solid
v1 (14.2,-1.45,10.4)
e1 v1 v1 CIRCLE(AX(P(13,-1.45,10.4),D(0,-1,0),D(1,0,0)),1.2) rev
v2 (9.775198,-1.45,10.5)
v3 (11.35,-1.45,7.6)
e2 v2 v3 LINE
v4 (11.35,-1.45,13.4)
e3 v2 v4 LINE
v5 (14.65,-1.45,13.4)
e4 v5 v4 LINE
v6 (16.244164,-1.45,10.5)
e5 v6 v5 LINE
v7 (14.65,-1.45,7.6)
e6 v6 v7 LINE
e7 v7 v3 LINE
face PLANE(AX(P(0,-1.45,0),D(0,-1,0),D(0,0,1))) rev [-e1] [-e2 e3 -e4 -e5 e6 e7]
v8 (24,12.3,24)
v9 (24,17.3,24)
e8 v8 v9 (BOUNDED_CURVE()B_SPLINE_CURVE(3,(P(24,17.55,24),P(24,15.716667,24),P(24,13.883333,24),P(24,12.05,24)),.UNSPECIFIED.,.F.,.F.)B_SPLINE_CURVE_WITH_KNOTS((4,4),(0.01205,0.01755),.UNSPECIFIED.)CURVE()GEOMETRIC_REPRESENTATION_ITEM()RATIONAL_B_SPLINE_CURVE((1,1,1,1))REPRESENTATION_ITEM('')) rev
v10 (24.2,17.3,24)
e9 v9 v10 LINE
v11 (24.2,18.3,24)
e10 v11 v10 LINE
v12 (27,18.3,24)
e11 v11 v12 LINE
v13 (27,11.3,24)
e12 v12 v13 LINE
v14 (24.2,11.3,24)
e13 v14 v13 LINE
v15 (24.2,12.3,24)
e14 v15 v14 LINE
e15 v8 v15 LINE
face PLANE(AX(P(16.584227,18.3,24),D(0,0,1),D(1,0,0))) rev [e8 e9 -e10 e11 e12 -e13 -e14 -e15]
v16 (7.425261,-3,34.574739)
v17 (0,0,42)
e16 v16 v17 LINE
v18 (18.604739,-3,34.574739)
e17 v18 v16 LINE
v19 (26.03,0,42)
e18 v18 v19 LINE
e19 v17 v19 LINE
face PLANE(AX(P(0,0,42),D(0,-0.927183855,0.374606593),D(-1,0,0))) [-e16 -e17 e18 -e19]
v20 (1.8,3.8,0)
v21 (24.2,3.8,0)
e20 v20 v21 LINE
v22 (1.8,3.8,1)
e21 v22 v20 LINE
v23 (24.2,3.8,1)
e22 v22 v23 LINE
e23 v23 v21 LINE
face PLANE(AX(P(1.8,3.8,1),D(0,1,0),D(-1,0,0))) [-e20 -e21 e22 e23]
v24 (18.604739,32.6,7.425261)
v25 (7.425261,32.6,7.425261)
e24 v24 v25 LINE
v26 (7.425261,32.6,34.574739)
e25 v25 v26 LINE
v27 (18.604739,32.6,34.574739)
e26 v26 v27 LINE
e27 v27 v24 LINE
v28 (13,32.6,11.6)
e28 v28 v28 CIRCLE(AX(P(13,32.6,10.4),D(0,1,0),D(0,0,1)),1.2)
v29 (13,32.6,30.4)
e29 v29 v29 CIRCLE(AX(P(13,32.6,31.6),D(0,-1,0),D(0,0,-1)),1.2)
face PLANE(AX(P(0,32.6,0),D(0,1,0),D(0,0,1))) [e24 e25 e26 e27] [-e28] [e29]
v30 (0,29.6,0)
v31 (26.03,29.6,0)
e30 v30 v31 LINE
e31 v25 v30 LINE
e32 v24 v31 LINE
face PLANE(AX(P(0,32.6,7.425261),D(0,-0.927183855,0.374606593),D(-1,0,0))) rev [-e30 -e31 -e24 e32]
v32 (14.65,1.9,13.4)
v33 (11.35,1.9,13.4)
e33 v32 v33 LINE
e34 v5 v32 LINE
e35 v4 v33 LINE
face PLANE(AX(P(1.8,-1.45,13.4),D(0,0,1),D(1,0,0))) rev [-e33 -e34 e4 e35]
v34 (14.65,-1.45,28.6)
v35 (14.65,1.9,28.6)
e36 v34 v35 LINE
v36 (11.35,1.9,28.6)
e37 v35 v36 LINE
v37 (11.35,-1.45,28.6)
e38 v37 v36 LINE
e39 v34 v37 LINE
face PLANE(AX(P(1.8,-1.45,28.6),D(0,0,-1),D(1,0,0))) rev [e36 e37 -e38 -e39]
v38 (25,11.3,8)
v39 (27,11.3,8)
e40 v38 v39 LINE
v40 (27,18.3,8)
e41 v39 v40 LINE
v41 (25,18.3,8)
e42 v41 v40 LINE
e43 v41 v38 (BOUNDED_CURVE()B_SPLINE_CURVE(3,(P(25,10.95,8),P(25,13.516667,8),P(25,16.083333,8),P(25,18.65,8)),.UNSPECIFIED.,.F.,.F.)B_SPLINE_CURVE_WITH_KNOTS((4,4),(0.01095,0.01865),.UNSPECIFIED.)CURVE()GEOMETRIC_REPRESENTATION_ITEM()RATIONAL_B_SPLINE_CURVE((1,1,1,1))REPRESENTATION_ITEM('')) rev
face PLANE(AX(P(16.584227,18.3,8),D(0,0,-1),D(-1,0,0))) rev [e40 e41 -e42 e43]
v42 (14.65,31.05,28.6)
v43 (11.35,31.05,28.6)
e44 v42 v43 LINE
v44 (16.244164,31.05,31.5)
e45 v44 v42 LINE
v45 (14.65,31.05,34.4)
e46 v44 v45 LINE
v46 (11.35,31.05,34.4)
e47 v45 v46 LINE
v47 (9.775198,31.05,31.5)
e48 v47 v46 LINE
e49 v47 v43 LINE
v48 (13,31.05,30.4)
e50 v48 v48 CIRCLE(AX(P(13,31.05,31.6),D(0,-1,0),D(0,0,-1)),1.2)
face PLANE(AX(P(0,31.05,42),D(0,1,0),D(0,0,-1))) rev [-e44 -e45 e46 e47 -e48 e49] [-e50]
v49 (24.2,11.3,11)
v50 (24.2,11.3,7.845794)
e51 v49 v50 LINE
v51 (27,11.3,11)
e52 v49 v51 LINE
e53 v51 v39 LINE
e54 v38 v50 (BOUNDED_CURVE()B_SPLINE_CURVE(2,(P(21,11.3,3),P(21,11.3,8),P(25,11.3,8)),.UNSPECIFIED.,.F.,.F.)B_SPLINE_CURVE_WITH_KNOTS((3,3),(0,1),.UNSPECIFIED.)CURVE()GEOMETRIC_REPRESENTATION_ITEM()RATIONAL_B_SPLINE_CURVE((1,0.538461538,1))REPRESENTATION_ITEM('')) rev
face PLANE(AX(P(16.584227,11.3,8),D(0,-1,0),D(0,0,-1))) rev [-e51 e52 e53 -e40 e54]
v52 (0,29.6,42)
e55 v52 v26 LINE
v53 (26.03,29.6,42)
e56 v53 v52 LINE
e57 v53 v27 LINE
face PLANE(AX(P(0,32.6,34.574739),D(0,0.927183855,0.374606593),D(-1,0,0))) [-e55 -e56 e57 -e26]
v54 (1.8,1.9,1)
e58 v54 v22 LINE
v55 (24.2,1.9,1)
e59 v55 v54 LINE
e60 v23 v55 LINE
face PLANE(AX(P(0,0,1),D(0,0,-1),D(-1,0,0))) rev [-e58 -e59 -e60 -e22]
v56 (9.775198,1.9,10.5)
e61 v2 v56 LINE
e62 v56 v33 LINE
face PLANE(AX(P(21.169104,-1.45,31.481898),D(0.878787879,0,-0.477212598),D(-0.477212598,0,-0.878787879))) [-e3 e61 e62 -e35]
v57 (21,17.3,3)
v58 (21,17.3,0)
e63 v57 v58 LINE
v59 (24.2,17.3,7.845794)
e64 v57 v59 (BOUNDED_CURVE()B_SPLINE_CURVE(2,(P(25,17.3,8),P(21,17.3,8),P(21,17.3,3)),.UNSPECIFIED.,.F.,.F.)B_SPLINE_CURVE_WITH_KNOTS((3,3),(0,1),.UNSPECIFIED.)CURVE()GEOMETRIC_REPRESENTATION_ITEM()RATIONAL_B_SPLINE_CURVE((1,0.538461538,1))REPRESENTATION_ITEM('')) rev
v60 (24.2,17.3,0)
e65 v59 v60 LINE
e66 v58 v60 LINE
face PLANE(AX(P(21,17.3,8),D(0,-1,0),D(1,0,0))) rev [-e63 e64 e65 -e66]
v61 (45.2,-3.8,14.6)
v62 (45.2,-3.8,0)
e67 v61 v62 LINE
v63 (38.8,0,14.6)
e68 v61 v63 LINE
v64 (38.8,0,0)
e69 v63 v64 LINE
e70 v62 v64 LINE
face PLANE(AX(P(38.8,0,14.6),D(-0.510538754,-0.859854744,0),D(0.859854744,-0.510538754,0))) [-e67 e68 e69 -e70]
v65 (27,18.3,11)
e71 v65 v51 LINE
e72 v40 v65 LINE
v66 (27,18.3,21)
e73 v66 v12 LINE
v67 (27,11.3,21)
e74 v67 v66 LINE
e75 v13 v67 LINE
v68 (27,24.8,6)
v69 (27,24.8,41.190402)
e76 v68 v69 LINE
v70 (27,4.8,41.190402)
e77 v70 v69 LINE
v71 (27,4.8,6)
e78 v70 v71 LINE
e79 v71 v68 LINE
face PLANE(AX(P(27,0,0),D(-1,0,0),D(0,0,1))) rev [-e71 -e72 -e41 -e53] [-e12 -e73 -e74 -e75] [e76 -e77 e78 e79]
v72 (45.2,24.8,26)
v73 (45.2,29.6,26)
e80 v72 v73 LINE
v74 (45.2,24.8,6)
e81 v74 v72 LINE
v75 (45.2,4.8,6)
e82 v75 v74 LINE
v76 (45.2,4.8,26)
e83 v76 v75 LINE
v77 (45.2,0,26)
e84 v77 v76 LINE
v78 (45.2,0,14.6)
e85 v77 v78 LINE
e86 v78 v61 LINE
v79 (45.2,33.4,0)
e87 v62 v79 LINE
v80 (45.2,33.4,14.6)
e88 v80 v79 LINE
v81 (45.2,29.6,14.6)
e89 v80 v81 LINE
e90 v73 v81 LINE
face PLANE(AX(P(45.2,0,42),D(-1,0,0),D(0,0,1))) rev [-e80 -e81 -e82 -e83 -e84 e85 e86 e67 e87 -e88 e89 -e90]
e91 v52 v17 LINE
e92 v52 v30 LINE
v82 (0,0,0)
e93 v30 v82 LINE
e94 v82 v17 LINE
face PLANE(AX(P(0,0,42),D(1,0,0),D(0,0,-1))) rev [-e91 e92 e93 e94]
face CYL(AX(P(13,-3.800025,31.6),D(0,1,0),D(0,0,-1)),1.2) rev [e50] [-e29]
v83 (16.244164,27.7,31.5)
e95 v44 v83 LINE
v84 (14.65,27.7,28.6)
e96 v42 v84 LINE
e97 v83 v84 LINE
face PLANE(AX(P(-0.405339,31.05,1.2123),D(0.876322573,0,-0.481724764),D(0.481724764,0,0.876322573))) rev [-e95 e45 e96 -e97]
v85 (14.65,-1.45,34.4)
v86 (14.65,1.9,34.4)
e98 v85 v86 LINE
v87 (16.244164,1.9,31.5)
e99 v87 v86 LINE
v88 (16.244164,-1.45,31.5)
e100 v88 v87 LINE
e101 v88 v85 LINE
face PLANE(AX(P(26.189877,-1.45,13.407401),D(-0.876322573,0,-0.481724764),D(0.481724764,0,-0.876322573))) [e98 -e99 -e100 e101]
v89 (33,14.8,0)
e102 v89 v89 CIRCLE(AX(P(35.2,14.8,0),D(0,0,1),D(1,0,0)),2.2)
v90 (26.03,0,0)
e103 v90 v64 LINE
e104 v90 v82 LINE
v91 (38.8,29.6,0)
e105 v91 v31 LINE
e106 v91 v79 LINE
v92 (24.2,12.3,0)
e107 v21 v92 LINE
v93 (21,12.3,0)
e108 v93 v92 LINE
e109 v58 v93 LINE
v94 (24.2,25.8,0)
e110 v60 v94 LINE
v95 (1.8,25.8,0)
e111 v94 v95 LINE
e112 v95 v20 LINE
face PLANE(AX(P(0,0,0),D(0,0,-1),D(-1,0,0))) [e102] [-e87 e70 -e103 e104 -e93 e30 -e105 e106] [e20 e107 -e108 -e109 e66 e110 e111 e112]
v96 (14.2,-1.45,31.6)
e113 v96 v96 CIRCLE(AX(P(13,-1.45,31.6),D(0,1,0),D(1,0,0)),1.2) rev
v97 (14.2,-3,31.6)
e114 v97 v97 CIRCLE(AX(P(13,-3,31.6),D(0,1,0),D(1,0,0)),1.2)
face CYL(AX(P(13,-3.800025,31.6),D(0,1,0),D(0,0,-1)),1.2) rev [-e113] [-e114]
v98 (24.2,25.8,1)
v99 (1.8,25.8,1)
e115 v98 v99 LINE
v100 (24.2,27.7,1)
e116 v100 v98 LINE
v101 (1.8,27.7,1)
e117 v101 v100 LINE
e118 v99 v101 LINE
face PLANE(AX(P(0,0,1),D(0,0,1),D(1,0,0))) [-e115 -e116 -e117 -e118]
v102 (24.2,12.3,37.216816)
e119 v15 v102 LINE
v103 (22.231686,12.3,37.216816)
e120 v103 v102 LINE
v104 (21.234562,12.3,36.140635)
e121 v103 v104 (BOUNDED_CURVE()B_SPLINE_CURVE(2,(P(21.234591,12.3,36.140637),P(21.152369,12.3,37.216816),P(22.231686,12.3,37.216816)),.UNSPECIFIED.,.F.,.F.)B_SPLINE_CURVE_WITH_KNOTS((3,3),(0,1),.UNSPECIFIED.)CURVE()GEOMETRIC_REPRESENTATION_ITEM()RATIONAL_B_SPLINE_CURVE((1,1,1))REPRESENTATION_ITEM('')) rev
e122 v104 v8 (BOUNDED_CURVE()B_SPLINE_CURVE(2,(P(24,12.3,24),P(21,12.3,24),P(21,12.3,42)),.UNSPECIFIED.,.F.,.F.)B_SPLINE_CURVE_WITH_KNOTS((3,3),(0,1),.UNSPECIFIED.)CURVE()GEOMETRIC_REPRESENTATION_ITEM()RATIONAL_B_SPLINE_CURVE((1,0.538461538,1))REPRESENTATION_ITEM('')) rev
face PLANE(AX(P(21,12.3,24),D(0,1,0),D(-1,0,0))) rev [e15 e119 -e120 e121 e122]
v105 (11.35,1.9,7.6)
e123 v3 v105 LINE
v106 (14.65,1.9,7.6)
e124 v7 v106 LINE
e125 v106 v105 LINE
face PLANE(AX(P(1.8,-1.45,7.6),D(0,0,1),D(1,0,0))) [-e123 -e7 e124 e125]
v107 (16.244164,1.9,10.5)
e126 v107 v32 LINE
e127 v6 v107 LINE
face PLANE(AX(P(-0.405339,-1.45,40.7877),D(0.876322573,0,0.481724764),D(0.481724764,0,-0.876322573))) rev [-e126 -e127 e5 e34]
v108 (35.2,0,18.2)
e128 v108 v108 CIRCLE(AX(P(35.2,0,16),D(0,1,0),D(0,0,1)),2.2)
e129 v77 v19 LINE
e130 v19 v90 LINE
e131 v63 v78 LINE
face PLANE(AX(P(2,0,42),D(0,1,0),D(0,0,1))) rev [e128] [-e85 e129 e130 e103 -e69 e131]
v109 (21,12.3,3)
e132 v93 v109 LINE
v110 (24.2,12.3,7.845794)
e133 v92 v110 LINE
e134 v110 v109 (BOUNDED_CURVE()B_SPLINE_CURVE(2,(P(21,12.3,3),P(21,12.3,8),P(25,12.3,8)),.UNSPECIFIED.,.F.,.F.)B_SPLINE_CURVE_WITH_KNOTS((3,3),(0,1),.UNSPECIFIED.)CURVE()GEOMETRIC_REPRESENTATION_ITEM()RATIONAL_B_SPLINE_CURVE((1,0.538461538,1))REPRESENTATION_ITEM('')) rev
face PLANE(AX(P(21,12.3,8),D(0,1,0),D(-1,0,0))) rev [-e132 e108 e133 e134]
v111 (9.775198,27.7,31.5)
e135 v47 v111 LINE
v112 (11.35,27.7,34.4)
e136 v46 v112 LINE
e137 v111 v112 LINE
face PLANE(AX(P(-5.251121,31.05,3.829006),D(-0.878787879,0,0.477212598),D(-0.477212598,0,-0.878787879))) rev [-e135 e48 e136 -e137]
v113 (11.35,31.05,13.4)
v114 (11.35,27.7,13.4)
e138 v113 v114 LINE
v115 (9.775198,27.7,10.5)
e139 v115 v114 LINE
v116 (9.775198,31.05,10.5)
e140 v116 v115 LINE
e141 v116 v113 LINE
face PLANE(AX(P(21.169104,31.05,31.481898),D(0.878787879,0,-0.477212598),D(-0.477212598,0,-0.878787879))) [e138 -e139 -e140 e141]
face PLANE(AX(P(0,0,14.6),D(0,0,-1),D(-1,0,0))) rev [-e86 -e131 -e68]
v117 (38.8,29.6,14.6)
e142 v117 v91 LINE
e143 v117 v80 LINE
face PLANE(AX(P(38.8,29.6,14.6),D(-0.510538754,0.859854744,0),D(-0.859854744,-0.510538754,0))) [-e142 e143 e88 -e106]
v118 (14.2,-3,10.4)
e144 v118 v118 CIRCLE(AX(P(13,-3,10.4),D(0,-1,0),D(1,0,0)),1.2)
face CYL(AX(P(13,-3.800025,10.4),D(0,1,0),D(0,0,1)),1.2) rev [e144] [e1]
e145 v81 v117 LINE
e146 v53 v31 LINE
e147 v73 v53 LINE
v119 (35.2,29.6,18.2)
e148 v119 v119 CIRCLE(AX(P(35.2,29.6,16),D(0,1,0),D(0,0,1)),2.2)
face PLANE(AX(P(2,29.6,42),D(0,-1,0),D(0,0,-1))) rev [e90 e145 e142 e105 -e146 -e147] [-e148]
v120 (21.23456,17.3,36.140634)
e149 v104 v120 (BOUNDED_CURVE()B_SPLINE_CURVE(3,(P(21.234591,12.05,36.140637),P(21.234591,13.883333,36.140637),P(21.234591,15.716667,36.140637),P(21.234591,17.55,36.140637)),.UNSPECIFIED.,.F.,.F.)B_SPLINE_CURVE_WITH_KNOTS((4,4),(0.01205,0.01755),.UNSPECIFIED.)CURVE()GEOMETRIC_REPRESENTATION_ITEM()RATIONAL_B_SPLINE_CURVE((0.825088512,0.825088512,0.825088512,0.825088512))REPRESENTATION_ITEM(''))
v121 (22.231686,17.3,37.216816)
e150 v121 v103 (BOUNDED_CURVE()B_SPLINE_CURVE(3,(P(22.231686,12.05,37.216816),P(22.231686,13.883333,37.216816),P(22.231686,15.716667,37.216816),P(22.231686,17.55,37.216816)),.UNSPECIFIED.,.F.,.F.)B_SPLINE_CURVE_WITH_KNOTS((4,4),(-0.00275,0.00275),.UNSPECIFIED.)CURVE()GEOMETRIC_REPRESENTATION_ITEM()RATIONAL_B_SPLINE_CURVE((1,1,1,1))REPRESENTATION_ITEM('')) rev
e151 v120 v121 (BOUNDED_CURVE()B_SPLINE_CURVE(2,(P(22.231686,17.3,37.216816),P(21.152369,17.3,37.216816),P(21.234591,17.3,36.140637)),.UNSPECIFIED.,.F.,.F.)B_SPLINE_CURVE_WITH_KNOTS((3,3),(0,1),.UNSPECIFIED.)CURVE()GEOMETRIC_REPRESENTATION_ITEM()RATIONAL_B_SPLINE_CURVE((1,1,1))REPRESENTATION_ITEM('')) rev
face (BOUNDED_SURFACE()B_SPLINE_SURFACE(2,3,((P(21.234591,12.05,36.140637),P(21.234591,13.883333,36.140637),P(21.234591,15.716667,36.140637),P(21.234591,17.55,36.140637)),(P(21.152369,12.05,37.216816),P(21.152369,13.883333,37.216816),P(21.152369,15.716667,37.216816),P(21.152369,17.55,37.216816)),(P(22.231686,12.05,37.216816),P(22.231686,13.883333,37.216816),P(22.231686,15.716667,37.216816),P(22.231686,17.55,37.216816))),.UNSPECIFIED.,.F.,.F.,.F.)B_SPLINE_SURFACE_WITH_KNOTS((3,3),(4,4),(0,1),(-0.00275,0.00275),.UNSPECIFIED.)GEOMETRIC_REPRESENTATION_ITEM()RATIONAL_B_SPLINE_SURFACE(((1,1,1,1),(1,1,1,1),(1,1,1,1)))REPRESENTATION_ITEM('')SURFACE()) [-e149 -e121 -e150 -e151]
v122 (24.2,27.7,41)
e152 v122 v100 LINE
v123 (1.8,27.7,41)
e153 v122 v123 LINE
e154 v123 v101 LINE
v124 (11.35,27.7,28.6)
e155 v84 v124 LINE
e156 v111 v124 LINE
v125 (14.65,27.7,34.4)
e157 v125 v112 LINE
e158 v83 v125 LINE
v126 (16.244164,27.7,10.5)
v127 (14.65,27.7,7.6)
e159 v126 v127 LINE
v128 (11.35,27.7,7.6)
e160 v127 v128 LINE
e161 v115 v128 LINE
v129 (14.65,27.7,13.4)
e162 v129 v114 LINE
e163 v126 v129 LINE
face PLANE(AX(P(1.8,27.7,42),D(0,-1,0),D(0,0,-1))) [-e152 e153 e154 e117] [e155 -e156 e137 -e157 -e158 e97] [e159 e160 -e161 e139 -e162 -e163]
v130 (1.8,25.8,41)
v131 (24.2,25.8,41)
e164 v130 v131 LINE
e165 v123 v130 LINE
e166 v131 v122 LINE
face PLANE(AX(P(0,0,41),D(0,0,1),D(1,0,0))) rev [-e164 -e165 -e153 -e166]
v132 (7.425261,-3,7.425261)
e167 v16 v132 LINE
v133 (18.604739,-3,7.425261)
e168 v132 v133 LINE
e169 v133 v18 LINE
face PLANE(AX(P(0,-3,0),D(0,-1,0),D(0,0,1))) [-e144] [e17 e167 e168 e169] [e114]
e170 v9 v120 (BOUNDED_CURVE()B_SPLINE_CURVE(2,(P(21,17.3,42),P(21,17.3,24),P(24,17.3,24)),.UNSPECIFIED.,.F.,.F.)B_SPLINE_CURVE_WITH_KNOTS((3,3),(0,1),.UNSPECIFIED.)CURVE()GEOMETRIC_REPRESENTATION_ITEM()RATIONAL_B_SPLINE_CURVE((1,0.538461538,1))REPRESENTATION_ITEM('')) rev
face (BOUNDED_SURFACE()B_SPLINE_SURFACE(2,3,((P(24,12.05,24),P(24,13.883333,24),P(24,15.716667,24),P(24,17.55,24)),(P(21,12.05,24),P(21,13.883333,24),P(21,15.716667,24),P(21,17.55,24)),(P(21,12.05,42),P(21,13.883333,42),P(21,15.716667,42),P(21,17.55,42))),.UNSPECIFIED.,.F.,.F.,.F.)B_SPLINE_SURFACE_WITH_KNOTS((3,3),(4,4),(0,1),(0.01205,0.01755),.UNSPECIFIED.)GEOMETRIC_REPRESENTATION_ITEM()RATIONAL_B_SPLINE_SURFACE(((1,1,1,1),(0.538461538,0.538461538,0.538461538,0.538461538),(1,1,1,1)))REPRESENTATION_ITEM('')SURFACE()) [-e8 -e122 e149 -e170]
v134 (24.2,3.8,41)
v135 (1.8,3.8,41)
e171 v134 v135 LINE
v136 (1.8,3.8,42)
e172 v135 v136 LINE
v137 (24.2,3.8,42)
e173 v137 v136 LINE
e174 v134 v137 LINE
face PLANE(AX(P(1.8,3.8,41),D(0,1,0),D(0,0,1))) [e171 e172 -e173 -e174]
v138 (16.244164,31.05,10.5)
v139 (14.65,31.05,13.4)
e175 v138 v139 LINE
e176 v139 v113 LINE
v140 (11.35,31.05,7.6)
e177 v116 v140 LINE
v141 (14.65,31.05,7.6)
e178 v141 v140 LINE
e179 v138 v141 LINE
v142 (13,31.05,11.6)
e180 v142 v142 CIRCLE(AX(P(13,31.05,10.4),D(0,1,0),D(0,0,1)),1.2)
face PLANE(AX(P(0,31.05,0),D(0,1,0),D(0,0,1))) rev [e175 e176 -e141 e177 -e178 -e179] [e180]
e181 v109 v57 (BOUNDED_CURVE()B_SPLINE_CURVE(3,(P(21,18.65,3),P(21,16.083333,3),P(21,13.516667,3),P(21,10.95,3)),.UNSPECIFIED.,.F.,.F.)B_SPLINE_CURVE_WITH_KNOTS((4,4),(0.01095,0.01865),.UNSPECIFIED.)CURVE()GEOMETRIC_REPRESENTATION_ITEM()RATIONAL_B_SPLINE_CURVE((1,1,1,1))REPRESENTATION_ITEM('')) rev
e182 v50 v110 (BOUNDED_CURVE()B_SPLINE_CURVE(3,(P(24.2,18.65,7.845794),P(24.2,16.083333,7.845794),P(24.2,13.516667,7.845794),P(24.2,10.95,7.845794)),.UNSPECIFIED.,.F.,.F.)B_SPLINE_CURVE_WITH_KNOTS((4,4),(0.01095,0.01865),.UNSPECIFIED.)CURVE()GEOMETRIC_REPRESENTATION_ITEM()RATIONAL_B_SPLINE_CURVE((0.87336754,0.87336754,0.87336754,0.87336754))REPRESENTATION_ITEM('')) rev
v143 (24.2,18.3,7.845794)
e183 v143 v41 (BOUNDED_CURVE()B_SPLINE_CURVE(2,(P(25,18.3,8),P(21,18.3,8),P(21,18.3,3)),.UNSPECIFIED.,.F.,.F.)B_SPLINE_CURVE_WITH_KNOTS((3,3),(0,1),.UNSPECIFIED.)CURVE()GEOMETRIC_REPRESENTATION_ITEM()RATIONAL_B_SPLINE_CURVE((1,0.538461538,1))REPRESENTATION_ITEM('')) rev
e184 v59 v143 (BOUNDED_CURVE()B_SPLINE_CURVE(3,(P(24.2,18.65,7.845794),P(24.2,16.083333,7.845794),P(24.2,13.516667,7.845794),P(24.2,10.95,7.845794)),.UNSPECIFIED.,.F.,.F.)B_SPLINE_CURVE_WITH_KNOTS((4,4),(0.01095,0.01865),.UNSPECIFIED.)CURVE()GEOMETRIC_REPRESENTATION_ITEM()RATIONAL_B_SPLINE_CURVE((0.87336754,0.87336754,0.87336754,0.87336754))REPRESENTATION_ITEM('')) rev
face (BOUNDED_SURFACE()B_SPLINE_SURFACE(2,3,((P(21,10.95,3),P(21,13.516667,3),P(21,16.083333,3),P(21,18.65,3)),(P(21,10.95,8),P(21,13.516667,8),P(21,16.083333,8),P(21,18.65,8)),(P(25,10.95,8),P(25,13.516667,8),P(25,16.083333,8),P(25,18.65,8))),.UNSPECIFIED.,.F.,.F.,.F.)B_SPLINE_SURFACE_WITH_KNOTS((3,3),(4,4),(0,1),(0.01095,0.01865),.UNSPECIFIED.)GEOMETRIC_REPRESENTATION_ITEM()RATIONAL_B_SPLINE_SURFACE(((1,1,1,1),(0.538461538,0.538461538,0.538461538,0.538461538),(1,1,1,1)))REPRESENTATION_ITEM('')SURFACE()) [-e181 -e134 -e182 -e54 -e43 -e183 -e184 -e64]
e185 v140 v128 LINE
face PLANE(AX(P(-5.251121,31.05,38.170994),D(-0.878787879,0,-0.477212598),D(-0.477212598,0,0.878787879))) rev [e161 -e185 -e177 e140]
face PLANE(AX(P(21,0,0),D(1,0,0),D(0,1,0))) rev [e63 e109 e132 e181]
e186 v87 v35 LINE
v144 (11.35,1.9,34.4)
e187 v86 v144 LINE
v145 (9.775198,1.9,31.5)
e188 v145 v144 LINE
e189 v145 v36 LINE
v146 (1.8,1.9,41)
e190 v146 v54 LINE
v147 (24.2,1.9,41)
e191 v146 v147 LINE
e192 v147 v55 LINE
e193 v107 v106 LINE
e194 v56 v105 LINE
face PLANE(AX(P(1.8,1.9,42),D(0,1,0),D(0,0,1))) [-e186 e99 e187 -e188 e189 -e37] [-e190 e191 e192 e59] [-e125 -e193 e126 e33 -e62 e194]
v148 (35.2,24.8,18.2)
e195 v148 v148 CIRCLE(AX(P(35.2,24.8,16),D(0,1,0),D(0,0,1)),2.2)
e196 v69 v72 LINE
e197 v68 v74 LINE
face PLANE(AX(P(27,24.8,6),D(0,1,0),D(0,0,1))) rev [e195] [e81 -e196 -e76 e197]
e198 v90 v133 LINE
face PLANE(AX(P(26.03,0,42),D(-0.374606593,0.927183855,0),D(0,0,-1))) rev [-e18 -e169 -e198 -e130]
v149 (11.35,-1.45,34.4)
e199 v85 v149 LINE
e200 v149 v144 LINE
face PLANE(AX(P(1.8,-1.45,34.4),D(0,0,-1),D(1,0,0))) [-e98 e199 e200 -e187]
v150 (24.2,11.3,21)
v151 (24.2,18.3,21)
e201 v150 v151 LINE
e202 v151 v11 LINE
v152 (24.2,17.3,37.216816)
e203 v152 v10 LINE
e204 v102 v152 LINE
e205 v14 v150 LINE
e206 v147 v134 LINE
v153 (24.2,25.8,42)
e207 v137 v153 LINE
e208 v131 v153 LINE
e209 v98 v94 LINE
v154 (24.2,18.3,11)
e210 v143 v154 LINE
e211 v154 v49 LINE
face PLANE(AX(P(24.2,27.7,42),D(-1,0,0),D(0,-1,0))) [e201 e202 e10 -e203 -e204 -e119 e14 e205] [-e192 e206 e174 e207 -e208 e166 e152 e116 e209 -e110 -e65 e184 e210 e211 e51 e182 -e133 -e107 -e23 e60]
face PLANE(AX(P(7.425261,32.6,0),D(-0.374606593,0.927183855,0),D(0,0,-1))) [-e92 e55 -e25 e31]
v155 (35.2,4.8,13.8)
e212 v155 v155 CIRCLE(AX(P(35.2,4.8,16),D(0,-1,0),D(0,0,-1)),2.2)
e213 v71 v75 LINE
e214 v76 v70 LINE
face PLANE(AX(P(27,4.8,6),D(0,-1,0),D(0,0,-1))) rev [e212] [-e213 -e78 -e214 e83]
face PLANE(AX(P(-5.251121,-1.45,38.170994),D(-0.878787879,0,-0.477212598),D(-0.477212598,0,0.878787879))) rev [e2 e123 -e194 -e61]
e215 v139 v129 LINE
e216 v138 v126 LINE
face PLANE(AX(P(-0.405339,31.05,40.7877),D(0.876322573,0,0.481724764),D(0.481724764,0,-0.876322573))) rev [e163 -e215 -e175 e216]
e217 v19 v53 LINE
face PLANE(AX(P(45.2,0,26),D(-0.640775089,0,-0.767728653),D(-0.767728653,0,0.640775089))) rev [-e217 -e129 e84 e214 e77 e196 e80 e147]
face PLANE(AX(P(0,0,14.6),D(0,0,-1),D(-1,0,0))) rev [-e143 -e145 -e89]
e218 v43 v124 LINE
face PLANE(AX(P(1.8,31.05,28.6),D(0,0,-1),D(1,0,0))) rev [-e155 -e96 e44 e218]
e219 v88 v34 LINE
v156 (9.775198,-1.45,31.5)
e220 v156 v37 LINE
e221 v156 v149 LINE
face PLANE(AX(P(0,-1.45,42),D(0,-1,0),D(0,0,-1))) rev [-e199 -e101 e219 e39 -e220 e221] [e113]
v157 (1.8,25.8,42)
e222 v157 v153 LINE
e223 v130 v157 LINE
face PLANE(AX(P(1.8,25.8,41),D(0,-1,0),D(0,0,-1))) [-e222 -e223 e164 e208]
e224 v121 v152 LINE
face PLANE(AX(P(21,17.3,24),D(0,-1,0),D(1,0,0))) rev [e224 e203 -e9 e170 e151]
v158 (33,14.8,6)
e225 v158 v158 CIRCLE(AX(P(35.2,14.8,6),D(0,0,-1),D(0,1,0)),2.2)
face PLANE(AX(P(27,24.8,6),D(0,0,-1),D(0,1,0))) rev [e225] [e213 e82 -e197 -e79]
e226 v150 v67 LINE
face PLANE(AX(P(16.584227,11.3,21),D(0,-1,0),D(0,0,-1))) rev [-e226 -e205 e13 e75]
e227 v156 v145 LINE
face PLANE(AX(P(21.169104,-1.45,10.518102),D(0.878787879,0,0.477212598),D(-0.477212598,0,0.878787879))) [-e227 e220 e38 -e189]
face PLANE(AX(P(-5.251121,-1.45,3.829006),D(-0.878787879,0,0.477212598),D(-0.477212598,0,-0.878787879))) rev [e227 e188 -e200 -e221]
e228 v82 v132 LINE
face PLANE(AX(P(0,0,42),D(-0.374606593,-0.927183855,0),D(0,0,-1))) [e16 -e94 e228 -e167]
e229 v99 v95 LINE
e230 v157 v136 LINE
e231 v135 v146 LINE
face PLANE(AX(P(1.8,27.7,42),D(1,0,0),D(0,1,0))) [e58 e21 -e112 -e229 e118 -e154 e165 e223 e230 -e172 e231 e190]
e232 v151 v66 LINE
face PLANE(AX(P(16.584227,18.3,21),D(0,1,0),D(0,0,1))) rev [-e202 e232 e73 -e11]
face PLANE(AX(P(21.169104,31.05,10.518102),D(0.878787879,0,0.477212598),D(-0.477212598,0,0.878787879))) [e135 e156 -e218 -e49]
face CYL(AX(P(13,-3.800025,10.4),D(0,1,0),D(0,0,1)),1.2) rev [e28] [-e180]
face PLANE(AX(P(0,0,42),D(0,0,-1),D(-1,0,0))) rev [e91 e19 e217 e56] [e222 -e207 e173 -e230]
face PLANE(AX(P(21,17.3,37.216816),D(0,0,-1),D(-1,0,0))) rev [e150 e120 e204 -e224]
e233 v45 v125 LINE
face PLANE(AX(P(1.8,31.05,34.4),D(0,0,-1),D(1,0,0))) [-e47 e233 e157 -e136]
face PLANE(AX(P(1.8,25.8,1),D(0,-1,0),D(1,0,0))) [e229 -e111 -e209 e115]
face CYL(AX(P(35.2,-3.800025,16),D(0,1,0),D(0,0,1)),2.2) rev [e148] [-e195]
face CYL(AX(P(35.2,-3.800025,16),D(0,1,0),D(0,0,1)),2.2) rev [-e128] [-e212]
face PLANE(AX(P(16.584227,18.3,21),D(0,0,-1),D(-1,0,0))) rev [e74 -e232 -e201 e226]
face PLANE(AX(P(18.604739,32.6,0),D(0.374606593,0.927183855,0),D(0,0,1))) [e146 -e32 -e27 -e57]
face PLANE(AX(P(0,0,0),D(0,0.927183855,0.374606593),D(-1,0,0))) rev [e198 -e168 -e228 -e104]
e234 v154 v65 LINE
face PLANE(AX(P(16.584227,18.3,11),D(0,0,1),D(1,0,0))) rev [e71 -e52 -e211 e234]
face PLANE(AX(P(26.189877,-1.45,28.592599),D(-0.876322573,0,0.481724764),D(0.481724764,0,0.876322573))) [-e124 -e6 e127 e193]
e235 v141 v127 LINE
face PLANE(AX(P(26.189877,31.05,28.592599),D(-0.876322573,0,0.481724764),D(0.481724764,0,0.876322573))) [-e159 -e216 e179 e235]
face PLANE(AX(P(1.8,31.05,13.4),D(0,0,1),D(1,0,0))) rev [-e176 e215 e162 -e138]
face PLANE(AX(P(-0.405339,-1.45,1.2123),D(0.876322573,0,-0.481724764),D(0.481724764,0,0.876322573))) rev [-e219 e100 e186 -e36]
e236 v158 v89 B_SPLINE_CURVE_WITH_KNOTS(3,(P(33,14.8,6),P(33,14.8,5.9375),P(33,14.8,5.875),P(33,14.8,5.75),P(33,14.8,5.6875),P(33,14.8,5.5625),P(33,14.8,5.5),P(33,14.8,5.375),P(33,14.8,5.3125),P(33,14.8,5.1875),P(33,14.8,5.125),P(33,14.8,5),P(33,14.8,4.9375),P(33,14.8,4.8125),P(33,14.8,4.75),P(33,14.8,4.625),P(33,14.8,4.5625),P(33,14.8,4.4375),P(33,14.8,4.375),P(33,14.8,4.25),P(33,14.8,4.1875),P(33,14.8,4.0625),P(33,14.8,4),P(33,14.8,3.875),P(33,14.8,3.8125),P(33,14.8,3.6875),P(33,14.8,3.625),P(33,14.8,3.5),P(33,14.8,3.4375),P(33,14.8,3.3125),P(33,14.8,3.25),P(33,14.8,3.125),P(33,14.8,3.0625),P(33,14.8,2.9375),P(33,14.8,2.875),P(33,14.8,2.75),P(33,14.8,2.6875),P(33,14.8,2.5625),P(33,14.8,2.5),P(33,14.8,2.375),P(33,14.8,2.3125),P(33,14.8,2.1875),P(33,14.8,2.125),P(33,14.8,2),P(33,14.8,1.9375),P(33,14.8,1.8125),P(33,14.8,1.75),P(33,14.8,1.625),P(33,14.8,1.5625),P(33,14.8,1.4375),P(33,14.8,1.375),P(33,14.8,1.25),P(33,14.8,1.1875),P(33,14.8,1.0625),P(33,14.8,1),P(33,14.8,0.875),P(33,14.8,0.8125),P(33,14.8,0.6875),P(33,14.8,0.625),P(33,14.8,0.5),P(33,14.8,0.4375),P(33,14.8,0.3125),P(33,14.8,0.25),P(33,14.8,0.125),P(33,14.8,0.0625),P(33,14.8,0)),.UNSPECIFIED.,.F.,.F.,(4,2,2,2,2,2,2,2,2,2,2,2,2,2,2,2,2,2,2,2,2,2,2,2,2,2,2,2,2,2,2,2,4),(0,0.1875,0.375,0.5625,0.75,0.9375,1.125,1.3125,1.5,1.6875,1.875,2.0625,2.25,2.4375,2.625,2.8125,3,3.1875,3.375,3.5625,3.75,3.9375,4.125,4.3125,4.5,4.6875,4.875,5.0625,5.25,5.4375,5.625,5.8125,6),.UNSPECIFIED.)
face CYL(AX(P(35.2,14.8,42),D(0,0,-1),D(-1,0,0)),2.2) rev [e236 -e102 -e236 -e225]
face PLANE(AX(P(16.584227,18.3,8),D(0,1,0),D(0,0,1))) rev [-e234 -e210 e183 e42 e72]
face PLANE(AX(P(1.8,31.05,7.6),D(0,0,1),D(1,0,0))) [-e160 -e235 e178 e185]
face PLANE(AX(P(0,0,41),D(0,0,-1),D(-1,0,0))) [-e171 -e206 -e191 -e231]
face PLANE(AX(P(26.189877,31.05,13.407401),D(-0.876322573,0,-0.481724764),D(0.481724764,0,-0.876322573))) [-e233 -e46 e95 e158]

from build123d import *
from OCP.BRepFilletAPI import BRepFilletAPI_MakeChamfer

# Parameters (mm, degrees)
SKETCH1_R                  = 2.2
SKETCH1_W                  = 22.4
SKETCH1_H                  = 25.8
BOSS_EXTRUDE1_DEPTH        = 42
CUT_EXTRUDE1_DEPTH         = 69.433909723
BOSS_EXTRUDE2_DEPTH        = 14.6
SKETCH4_W                  = 36
SKETCH4_H                  = 20
CUT_EXTRUDE2_DEPTH         = 18.2
SKETCH5_R                  = 2.2
CUT_EXTRUDE3_DEPTH         = 71.161242862
SKETCH16_W                 = 26.03
SKETCH16_H                 = 42
BOSS_EXTRUDE6_DEPTH        = 3
CHAMFER1_SIZE              = 7.42526056
CHAMFER1_SIZE_2            = 3
CHAMFER1_OF_MIRROR7_SIZE   = 7.42526056
CHAMFER1_OF_MIRROR7_SIZE_2 = 3
CUT_EXTRUDE4_START         = -1.9
CUT_EXTRUDE4_DEPTH         = 3.35
SKETCH10_R                 = 1.2
CUT_EXTRUDE10_DEPTH        = 72.637978754
SKETCH13_W                 = 22.4
SKETCH13_H                 = 1.9
BOSS_EXTRUDE4_DEPTH        = 1
SKETCH14_W                 = 3
SKETCH14_H                 = 7
CUT_EXTRUDE11_DEPTH        = 2.8
SKETCH15_W                 = 22.4
SKETCH15_H                 = 1.9
BOSS_EXTRUDE5_DEPTH        = 1
MIRROR5_START              = -1.9
MIRROR5_COPY_1_DEPTH       = 3.35
SKETCH17_W                 = 13.216816462
SKETCH17_H                 = 5
SKETCH17_W_2               = 8
BOSS_EXTRUDE7_DEPTH        = 3.2
FILLET1_SIZE               = 3
FILLET1_SIZE_2             = 18
FILLET3_SIZE               = 5
FILLET3_SIZE_2             = 4


# Some blends are built 0.0001 mm under size
with BuildPart() as part:
    # Sketch1 → Boss-Extrude1 (new body)
    with BuildSketch(Plane.XY):
        Polygon((2, 0), (45.2, 0), (45.2, 29.6), (2, 29.6), (0, 29.6), (0, 27.6), (0, 2), (0, 0), align=None)
        with Locations(Location((35.2, 14.8, 0), (0, 0, 180))):
            Circle(SKETCH1_R, mode=Mode.SUBTRACT)
        with Locations((13, 14.8)):
            Rectangle(SKETCH1_W, SKETCH1_H, mode=Mode.SUBTRACT)
    extrude(amount=BOSS_EXTRUDE1_DEPTH)

    # Sketch2 → Cut-Extrude1 (cut, through all)
    with BuildSketch(Plane(origin=(0, 29.6, 0), x_dir=(1, 0, 0), z_dir=(0, 1, 0))):
        Polygon((45.2, -26), (26.03, -42), (45.2, -42), align=None)
    extrude(amount=-CUT_EXTRUDE1_DEPTH, mode=Mode.SUBTRACT)

    # Sketch3 → Boss-Extrude2 (add)
    with BuildSketch(Plane(origin=(0, 0, 0), x_dir=(-1, 0, 0), z_dir=(0, 0, -1))):
        Polygon((-38.8, 0), (-45.2, -3.8), (-45.2, 0), align=None)
        Polygon((-45.2, 29.6), (-38.8, 29.6), (-45.2, 33.4), align=None)
    extrude(amount=-BOSS_EXTRUDE2_DEPTH)

    # Sketch4 → Cut-Extrude2 (cut)
    with BuildSketch(Plane(origin=(45.2, 0, 0), x_dir=(0, 0, -1), z_dir=(1, 0, 0))):
        with Locations((-24, 14.8)):
            Rectangle(SKETCH4_W, SKETCH4_H)
    extrude(amount=-CUT_EXTRUDE2_DEPTH, mode=Mode.SUBTRACT)

    # Sketch5 → Cut-Extrude3 (cut, through all)
    with BuildSketch(Plane(origin=(0, 29.6, 0), x_dir=(1, 0, 0), z_dir=(0, 1, 0))):
        with Locations(Location((35.2, -16, 0), (0, 0, 270))):
            Circle(SKETCH5_R)
    extrude(amount=-CUT_EXTRUDE3_DEPTH, mode=Mode.SUBTRACT)

    # Sketch16 → Boss-Extrude6 (add)
    with BuildSketch(Plane(origin=(0, 29.6, 0), x_dir=(1, 0, 0), z_dir=(0, 1, 0))):
        with Locations((13.015, -21)):
            Rectangle(SKETCH16_W, SKETCH16_H)
    boss_extrude6 = extrude(amount=BOSS_EXTRUDE6_DEPTH)

    # Chamfer1
    chamfer1_edges_1 = [part.edges().sort_by_distance(p)[0] for p in [
        (13.015, 32.6, 42),
    ]]
    chamfer1_side_1 = [part.faces().sort_by_distance(p)[0] for p in [
        (13.015, 32.6, 41.94),
    ]]
    chamfer1_edges_2 = [part.edges().sort_by_distance(p)[0] for p in [
        (26.03, 32.6, 21),
    ]]
    chamfer1_side_2 = [part.faces().sort_by_distance(p)[0] for p in [
        (26.03, 32.54, 21),
    ]]
    chamfer1_edges_3 = [part.edges().sort_by_distance(p)[0] for p in [
        (13.015, 32.6, 0),
    ]]
    chamfer1_side_3 = [part.faces().sort_by_distance(p)[0] for p in [
        (13.015, 32.6, 0.06),
    ]]
    chamfer1_edges_4 = [part.edges().sort_by_distance(p)[0] for p in [
        (0, 32.6, 21),
    ]]
    chamfer1_side_4 = [part.faces().sort_by_distance(p)[0] for p in [
        (0.06, 32.6, 21),
    ]]
    chamfer1 = BRepFilletAPI_MakeChamfer(part.part.solid().wrapped)
    for e in chamfer1_edges_1:
        chamfer1.Add(CHAMFER1_SIZE - 0.0001, CHAMFER1_SIZE_2 - 0.0001, e.wrapped, chamfer1_side_1[0].wrapped)
    for e in chamfer1_edges_2:
        chamfer1.Add(CHAMFER1_SIZE_2 - 0.0001, CHAMFER1_SIZE - 0.0001, e.wrapped, chamfer1_side_2[0].wrapped)
    for e in chamfer1_edges_3:
        chamfer1.Add(CHAMFER1_SIZE - 0.0001, CHAMFER1_SIZE_2 - 0.0001, e.wrapped, chamfer1_side_3[0].wrapped)
    for e in chamfer1_edges_4:
        chamfer1.Add(CHAMFER1_SIZE - 0.0001, CHAMFER1_SIZE_2 - 0.0001, e.wrapped, chamfer1_side_4[0].wrapped)
    add(Compound.cast(chamfer1.Shape()), mode=Mode.REPLACE)  # a hair under: the kernel refuses the full size

    # Mirror7: Boss-Extrude6 across plane
    add(boss_extrude6.mirror(Plane(origin=(0, 14.8, 0), x_dir=(0, 0, 1), z_dir=(0, -1, 0))))

    # Chamfer1 of Mirror7
    chamfer1_of_mirror7_edges_1 = [part.edges().sort_by_distance(p)[0] for p in [
        (13.015, -3, 42),
    ]]
    chamfer1_of_mirror7_side_1 = [part.faces().sort_by_distance(p)[0] for p in [
        (13.015, -3, 41.94),
    ]]
    chamfer1_of_mirror7_edges_2 = [part.edges().sort_by_distance(p)[0] for p in [
        (26.03, -3, 21),
    ]]
    chamfer1_of_mirror7_side_2 = [part.faces().sort_by_distance(p)[0] for p in [
        (26.03, -2.94, 21),
    ]]
    chamfer1_of_mirror7_edges_3 = [part.edges().sort_by_distance(p)[0] for p in [
        (13.015, -3, 0),
    ]]
    chamfer1_of_mirror7_side_3 = [part.faces().sort_by_distance(p)[0] for p in [
        (13.015, -2.94, 0),
    ]]
    chamfer1_of_mirror7_edges_4 = [part.edges().sort_by_distance(p)[0] for p in [
        (0, -3, 21),
    ]]
    chamfer1_of_mirror7_side_4 = [part.faces().sort_by_distance(p)[0] for p in [
        (0.06, -3, 21),
    ]]
    chamfer1_of_mirror7 = BRepFilletAPI_MakeChamfer(part.part.solid().wrapped)
    for e in chamfer1_of_mirror7_edges_1:
        chamfer1_of_mirror7.Add(CHAMFER1_OF_MIRROR7_SIZE - 0.0001, CHAMFER1_OF_MIRROR7_SIZE_2 - 0.0001, e.wrapped, chamfer1_of_mirror7_side_1[0].wrapped)
    for e in chamfer1_of_mirror7_edges_2:
        chamfer1_of_mirror7.Add(CHAMFER1_OF_MIRROR7_SIZE_2 - 0.0001, CHAMFER1_OF_MIRROR7_SIZE - 0.0001, e.wrapped, chamfer1_of_mirror7_side_2[0].wrapped)
    for e in chamfer1_of_mirror7_edges_3:
        chamfer1_of_mirror7.Add(CHAMFER1_OF_MIRROR7_SIZE_2 - 0.0001, CHAMFER1_OF_MIRROR7_SIZE - 0.0001, e.wrapped, chamfer1_of_mirror7_side_3[0].wrapped)
    for e in chamfer1_of_mirror7_edges_4:
        chamfer1_of_mirror7.Add(CHAMFER1_OF_MIRROR7_SIZE - 0.0001, CHAMFER1_OF_MIRROR7_SIZE_2 - 0.0001, e.wrapped, chamfer1_of_mirror7_side_4[0].wrapped)
    add(Compound.cast(chamfer1_of_mirror7.Shape()), mode=Mode.REPLACE)  # a hair under: the kernel refuses the full size

    # Sketch6 → Cut-Extrude4 (cut)
    with BuildSketch(Plane(origin=(0, 29.6, 0), x_dir=(1, 0, 0), z_dir=(0, 1, 0)).offset(CUT_EXTRUDE4_START)):
        Polygon((11.35, -13.4), (9.775198425, -10.5), (11.35, -7.6), (14.65, -7.6), (16.244163906, -10.5), (14.65, -13.4), align=None)
    cut_extrude4 = extrude(amount=CUT_EXTRUDE4_DEPTH, mode=Mode.SUBTRACT)

    # Sketch10 → Cut-Extrude10 (cut, through all)
    with BuildSketch(Plane(origin=(0, 32.6, 0), x_dir=(1, 0, 0), z_dir=(0, 1, 0))):
        with Locations(Location((13, -10.4, 0), (0, 0, 270))):
            Circle(SKETCH10_R)
    cut_extrude10 = extrude(amount=-CUT_EXTRUDE10_DEPTH, mode=Mode.SUBTRACT)

    # Mirror4: Cut-Extrude4 across plane
    add(cut_extrude4.mirror(Plane(origin=(0, 14.8, 0), x_dir=(0, 0, 1), z_dir=(0, -1, 0))), mode=Mode.SUBTRACT)

    # Sketch13 → Boss-Extrude4 (add)
    with BuildSketch(Plane.XY.offset(42)):
        with Locations((13, 2.85)):
            Rectangle(SKETCH13_W, SKETCH13_H)
        with Locations((13, 26.75)):
            Rectangle(SKETCH13_W, SKETCH13_H)
    extrude(amount=-BOSS_EXTRUDE4_DEPTH)

    # Sketch14 → Cut-Extrude11 (cut)
    with BuildSketch(Plane(origin=(27, 0, 0), x_dir=(0, 0, -1), z_dir=(1, 0, 0))):
        with Locations((-9.5, 14.8)):
            Rectangle(SKETCH14_W, SKETCH14_H)
        with Locations((-22.5, 14.8)):
            Rectangle(SKETCH14_W, SKETCH14_H)
    extrude(amount=-CUT_EXTRUDE11_DEPTH, mode=Mode.SUBTRACT)

    # Sketch15 → Boss-Extrude5 (add)
    with BuildSketch(Plane(origin=(0, 0, 0), x_dir=(-1, 0, 0), z_dir=(0, 0, -1))):
        with Locations((-13, 2.85)):
            Rectangle(SKETCH15_W, SKETCH15_H)
        with Locations((-13, 26.75)):
            Rectangle(SKETCH15_W, SKETCH15_H)
    extrude(amount=-BOSS_EXTRUDE5_DEPTH)

    # Mirror5: Cut-Extrude4, Cut-Extrude10 across plane
    add(cut_extrude4.mirror(Plane.XY.offset(21)), mode=Mode.SUBTRACT)
    add(cut_extrude10.mirror(Plane.XY.offset(21)), mode=Mode.SUBTRACT)

    # Mirror5 copy 1 sketch → Mirror5 copy 1 (cut)
    with BuildSketch(Plane(origin=(0, 0, 42), x_dir=(1, 0, 0), z_dir=(0, -1, 0)).offset(MIRROR5_START)):
        Polygon((11.35, -13.4), (9.775198425, -10.5), (11.35, -7.6), (14.65, -7.6), (16.244163906, -10.5), (14.65, -13.4), align=None)
    extrude(amount=MIRROR5_COPY_1_DEPTH, mode=Mode.SUBTRACT)

    # Sketch17 → Boss-Extrude7 (add)
    with BuildSketch(Plane.ZY.offset(-24.2)):
        with Locations((30.608408231, 14.8)):
            Rectangle(SKETCH17_W, SKETCH17_H)
        with Locations((4, 14.8)):
            Rectangle(SKETCH17_W_2, SKETCH17_H)
    extrude(amount=BOSS_EXTRUDE7_DEPTH)

    # Fillet1
    # a fillet whose section is not a circle: 18, 3 mm, written as the material it takes off along each edge
    with BuildSketch(Plane(origin=(21, 12.3, 24), x_dir=(1, 0, 0), z_dir=(0, 1, 0))) as fillet1_piece_1:
        with BuildLine():
            Bezier((FILLET1_SIZE, 0), (0, 0), (0, -FILLET1_SIZE_2), weights=[1, 0.538461538, 1])
            Line((0, -FILLET1_SIZE_2), (0, 0))
            Line((0, 0), (FILLET1_SIZE, 0))
        make_face()
    extrude(amount=5, mode=Mode.SUBTRACT)

    # Fillet2
    # a fillet whose section is not a circle: 1 mm, written as the material it takes off along each edge
    with BuildSketch(Plane(origin=(21.159285498, 19.997028117, 37.216816462), x_dir=(1, 0, 0), z_dir=(0, -1, 0))) as fillet2_piece_1:
        with BuildLine():
            Bezier((1.072400011, 0), (-0.006916058, 0), (0.075305906, -1.076179691), weights=[1, 1, 1])
            ThreePointArc((0.075305906, -1.076179691), (0.035933118, -0.538210194), (0, 0))
            Line((0, 0), (1.072400011, 0))
        make_face()
    extrude(amount=10.394056235, mode=Mode.SUBTRACT)

    # Fillet3
    # a fillet whose section is not a circle: 5, 4 mm, written as the material it takes off along each edge
    with BuildSketch(Plane(origin=(21, -0.2, 8), x_dir=(0, 0, -1), z_dir=(0, 1, 0))) as fillet3_piece_1_section:
        with BuildLine():
            Bezier((FILLET3_SIZE, 0), (0, 0), (0, -FILLET3_SIZE_2), weights=[1, 0.538461538, 1])
            Line((0, -FILLET3_SIZE_2), (0, 0))
            Line((0, 0), (FILLET3_SIZE, 0))
        make_face()
    fillet3_piece_1 = extrude(amount=30, mode=Mode.PRIVATE)
    fillet3_piece_1 = split(fillet3_piece_1, bisect_by=Plane(origin=(21, 18.3, 8), z_dir=(0, -1, 0)), keep=Keep.TOP, mode=Mode.PRIVATE)
    fillet3_piece_1 = split(fillet3_piece_1, bisect_by=Plane(origin=(21, 11.3, 8), z_dir=(0, 1, 0)), keep=Keep.TOP, mode=Mode.PRIVATE)
    add(fillet3_piece_1, mode=Mode.SUBTRACT)


solid = part.part
